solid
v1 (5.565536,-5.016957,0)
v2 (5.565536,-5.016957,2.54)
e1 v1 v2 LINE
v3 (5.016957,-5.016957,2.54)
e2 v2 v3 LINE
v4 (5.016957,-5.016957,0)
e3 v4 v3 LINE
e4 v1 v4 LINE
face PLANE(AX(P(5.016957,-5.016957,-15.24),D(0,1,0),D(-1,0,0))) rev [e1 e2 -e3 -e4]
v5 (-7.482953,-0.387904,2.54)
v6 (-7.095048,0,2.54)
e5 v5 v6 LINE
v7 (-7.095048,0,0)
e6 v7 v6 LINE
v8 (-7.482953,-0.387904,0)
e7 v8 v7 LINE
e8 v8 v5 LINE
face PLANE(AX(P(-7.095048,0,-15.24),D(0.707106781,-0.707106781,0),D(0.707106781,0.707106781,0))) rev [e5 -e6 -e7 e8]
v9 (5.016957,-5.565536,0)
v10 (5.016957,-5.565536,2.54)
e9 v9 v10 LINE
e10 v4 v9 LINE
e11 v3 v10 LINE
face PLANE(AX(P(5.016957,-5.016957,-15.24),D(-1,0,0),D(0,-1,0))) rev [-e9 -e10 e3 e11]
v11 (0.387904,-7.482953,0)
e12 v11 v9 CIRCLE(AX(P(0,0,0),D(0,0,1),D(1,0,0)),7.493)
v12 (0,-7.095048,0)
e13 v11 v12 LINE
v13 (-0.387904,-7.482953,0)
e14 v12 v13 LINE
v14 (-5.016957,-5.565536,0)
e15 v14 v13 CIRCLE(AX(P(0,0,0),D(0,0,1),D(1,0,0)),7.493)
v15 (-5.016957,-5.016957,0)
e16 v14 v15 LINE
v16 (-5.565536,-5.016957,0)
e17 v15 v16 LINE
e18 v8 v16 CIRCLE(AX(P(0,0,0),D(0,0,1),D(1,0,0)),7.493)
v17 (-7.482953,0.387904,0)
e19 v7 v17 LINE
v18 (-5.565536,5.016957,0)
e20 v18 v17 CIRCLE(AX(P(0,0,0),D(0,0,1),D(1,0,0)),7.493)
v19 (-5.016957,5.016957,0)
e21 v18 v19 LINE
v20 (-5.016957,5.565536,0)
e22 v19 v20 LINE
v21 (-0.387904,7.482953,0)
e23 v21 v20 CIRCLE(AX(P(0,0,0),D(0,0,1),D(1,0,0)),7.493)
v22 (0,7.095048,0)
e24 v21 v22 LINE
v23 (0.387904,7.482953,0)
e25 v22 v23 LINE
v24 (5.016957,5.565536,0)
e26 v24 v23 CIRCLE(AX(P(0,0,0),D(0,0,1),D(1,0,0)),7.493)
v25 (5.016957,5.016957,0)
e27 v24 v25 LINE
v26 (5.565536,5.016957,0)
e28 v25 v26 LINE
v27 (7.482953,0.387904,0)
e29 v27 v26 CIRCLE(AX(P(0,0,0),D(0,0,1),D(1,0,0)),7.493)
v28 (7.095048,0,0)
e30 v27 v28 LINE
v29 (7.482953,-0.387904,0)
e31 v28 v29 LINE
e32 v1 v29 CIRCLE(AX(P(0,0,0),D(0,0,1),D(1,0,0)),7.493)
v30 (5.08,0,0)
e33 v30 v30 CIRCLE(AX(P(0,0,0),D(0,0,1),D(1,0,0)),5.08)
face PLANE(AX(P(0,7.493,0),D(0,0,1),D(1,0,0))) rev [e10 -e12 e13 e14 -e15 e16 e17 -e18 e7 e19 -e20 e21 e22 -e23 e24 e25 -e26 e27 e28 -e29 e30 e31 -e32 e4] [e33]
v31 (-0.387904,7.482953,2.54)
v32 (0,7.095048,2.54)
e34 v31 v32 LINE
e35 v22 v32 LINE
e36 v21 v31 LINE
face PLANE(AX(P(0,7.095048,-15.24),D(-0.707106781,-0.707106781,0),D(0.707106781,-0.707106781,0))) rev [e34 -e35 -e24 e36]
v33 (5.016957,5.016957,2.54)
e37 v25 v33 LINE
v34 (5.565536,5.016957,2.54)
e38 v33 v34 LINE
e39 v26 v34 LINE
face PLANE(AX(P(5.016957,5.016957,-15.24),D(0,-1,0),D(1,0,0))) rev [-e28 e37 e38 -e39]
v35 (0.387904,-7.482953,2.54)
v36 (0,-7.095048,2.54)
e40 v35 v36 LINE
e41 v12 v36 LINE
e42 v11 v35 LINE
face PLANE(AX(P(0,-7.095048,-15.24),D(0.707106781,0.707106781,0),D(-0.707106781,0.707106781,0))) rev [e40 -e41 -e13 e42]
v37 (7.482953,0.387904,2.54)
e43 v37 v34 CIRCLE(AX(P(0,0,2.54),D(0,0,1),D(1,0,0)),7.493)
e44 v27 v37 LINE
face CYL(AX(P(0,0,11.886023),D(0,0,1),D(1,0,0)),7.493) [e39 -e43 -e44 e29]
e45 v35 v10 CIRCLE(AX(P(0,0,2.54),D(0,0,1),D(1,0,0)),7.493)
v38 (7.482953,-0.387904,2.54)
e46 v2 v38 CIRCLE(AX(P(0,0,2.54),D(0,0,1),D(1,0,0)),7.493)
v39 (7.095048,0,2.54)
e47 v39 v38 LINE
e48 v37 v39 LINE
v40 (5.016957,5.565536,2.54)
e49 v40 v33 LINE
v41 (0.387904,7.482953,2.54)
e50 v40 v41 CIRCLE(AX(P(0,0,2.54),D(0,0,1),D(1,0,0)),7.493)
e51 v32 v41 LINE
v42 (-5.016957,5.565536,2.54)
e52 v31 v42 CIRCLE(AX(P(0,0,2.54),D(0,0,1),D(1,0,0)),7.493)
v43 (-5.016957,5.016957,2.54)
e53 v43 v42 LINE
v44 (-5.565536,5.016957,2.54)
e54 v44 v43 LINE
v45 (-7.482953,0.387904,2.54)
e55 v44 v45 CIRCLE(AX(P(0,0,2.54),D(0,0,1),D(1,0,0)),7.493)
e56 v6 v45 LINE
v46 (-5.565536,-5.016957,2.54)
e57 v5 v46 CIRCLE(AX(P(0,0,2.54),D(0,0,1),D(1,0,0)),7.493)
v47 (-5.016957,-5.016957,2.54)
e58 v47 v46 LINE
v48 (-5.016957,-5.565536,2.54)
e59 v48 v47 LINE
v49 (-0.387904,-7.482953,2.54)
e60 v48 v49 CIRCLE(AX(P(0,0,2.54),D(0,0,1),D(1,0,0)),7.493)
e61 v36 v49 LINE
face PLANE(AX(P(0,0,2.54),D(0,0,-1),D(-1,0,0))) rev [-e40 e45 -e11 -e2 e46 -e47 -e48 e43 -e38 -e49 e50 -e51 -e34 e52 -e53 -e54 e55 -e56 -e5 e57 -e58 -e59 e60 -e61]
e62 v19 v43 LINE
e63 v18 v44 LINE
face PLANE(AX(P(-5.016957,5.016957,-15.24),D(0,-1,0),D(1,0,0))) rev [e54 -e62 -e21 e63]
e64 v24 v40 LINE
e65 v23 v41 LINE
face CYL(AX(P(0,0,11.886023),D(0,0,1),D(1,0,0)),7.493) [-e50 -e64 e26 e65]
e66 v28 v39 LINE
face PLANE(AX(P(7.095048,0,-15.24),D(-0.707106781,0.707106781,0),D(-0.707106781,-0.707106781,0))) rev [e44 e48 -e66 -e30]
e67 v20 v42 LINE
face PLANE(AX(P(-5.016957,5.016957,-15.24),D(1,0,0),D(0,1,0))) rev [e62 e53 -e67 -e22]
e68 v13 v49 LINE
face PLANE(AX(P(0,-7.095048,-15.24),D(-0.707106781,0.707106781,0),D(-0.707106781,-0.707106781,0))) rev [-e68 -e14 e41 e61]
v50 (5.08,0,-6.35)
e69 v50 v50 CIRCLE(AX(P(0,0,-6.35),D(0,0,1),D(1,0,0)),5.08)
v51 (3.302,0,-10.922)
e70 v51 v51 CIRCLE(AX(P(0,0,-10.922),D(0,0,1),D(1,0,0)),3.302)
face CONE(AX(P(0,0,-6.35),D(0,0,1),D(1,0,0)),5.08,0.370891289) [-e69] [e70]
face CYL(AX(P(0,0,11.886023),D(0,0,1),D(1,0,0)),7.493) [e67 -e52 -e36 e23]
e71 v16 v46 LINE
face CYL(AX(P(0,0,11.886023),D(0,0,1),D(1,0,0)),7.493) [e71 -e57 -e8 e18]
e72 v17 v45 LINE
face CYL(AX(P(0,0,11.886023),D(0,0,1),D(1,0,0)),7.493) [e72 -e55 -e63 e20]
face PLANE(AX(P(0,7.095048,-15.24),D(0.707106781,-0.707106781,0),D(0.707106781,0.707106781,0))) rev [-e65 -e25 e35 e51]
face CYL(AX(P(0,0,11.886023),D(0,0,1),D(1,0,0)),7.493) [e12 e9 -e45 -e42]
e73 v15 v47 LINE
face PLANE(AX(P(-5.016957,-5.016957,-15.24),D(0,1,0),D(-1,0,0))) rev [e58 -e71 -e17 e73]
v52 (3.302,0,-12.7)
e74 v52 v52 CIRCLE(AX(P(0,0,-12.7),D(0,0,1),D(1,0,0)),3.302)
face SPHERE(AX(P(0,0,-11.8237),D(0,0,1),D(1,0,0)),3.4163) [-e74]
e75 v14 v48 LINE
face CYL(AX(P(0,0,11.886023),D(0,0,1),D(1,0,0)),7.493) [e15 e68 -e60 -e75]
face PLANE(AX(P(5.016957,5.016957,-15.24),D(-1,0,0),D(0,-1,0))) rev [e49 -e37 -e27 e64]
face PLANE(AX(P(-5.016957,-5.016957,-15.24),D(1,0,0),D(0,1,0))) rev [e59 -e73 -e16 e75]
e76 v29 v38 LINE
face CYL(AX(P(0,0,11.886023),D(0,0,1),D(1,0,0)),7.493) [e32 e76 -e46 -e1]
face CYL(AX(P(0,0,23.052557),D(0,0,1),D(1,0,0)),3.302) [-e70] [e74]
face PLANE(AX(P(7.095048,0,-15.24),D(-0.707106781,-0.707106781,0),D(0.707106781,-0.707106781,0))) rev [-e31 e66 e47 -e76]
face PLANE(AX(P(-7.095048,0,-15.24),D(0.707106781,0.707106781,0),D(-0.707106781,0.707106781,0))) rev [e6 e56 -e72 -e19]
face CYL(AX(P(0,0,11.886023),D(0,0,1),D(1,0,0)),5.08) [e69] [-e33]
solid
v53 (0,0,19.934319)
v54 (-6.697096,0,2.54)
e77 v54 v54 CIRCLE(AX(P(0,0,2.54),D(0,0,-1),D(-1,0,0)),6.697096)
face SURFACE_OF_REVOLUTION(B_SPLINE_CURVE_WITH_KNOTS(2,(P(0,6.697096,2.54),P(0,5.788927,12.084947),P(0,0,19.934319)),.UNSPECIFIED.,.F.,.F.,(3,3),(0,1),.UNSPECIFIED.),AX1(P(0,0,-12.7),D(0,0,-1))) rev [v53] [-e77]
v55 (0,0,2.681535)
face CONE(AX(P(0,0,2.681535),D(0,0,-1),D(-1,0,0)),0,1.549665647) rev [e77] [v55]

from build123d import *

# Parameters (mm, degrees)
DOME1_FACE_RADIUS = 3.302
DOME1_HEIGHT      = 2.54
SEEDCUT_DEPTH     = 21.698272826
CIRPATTERN1_COUNT = 8


# Read off the part's stored shape, not the designer's step: Cut-Revolve-Thin1
with BuildPart() as part:
    # Sketch1 → Revolve1 (revolve)
    with BuildSketch(Plane(origin=(0, 0, 0), x_dir=(0, 0, -1), z_dir=(1, 0, 0)), mode=Mode.PRIVATE) as revolve1_sk:
        Polygon((-2.54, 0), (-2.54, 7.493), (0, 7.493), (0, 5.08), (12.7, 5.08), (12.7, 0), align=None)
    revolve(revolve1_sk.sketch.rotate(Axis((0, 0, 11.886023166), (0, 0, -1)), 90), axis=Axis((0, 0, 11.886023166), (0, 0, -1)))

    # Cut-Revolve-Thin1 outline → Cut-Revolve-Thin1 (revolve, cut)
    with BuildSketch(Plane.XZ):
        Polygon((3.302, -10.922), (3.302, -12.7), (5.08, -12.7), (5.08, -6.35), align=None)
    revolve(axis=Axis((0, 0, 0), (0, 0, 1)), mode=Mode.SUBTRACT)

    # Dome1: a dome of height H over a round flat face of radius A is a cap of a sphere of radius (A * A + H * H) / (2 * H)
    dome1_r = (DOME1_FACE_RADIUS * DOME1_FACE_RADIUS + DOME1_HEIGHT * DOME1_HEIGHT) / (2 * DOME1_HEIGHT)
    dome1_base = Plane((0, 0, -12.7), z_dir=(0, 0, -1))
    with Locations(dome1_base.offset(DOME1_HEIGHT - dome1_r)):
        dome1_ball = Sphere(dome1_r, mode=Mode.PRIVATE)
    add(split(dome1_ball, bisect_by=dome1_base, keep=Keep.TOP, mode=Mode.PRIVATE))

    # Sketch4 → SeedCut (cut, through all)
    with BuildSketch(Plane.XY.offset(2.54)):
        with BuildLine():
            Line((0, 7.095048069), (0.387904496, 7.482952566))
            ThreePointArc((0.387904496, 7.482952566), (0, 7.493), (-0.387904496, 7.482952566))
            Line((-0.387904496, 7.482952566), (0, 7.095048069))
        make_face()
    seedcut = extrude(amount=-SEEDCUT_DEPTH, mode=Mode.SUBTRACT)

    # CirPattern1: SeedCut ×8 about axis
    cirpattern1_axis = Axis((0, 0, 0), (0, 0, 1))
    for i in range(1, CIRPATTERN1_COUNT):
        add(seedcut.rotate(cirpattern1_axis, i * 360 / CIRPATTERN1_COUNT), mode=Mode.SUBTRACT)


with BuildPart() as body_2:
    # Sketch2 → Revolve2 (revolve)
    with BuildSketch(Plane(origin=(0, 0, 0), x_dir=(0, 0, -1), z_dir=(1, 0, 0)), mode=Mode.PRIVATE) as revolve2_sk:
        with BuildLine():
            Line((-19.934319353, 0), (-2.68153526, 0))
            Line((-2.68153526, 0), (-2.54, 6.697096139))
            add(Edge.make_bspline(
                [(-2.54, 6.697096139), (-12.084947129, 5.788927202), (-19.934319353, 0)],
                knots=[0, 0, 0, 1, 1, 1], degree=2))
        make_face()
    revolve(revolve2_sk.sketch.rotate(Axis((0, 0, 11.886023166), (0, 0, 1)), 90), axis=Axis((0, 0, 11.886023166), (0, 0, 1)))


solid = Compound([part.part, body_2.part])
